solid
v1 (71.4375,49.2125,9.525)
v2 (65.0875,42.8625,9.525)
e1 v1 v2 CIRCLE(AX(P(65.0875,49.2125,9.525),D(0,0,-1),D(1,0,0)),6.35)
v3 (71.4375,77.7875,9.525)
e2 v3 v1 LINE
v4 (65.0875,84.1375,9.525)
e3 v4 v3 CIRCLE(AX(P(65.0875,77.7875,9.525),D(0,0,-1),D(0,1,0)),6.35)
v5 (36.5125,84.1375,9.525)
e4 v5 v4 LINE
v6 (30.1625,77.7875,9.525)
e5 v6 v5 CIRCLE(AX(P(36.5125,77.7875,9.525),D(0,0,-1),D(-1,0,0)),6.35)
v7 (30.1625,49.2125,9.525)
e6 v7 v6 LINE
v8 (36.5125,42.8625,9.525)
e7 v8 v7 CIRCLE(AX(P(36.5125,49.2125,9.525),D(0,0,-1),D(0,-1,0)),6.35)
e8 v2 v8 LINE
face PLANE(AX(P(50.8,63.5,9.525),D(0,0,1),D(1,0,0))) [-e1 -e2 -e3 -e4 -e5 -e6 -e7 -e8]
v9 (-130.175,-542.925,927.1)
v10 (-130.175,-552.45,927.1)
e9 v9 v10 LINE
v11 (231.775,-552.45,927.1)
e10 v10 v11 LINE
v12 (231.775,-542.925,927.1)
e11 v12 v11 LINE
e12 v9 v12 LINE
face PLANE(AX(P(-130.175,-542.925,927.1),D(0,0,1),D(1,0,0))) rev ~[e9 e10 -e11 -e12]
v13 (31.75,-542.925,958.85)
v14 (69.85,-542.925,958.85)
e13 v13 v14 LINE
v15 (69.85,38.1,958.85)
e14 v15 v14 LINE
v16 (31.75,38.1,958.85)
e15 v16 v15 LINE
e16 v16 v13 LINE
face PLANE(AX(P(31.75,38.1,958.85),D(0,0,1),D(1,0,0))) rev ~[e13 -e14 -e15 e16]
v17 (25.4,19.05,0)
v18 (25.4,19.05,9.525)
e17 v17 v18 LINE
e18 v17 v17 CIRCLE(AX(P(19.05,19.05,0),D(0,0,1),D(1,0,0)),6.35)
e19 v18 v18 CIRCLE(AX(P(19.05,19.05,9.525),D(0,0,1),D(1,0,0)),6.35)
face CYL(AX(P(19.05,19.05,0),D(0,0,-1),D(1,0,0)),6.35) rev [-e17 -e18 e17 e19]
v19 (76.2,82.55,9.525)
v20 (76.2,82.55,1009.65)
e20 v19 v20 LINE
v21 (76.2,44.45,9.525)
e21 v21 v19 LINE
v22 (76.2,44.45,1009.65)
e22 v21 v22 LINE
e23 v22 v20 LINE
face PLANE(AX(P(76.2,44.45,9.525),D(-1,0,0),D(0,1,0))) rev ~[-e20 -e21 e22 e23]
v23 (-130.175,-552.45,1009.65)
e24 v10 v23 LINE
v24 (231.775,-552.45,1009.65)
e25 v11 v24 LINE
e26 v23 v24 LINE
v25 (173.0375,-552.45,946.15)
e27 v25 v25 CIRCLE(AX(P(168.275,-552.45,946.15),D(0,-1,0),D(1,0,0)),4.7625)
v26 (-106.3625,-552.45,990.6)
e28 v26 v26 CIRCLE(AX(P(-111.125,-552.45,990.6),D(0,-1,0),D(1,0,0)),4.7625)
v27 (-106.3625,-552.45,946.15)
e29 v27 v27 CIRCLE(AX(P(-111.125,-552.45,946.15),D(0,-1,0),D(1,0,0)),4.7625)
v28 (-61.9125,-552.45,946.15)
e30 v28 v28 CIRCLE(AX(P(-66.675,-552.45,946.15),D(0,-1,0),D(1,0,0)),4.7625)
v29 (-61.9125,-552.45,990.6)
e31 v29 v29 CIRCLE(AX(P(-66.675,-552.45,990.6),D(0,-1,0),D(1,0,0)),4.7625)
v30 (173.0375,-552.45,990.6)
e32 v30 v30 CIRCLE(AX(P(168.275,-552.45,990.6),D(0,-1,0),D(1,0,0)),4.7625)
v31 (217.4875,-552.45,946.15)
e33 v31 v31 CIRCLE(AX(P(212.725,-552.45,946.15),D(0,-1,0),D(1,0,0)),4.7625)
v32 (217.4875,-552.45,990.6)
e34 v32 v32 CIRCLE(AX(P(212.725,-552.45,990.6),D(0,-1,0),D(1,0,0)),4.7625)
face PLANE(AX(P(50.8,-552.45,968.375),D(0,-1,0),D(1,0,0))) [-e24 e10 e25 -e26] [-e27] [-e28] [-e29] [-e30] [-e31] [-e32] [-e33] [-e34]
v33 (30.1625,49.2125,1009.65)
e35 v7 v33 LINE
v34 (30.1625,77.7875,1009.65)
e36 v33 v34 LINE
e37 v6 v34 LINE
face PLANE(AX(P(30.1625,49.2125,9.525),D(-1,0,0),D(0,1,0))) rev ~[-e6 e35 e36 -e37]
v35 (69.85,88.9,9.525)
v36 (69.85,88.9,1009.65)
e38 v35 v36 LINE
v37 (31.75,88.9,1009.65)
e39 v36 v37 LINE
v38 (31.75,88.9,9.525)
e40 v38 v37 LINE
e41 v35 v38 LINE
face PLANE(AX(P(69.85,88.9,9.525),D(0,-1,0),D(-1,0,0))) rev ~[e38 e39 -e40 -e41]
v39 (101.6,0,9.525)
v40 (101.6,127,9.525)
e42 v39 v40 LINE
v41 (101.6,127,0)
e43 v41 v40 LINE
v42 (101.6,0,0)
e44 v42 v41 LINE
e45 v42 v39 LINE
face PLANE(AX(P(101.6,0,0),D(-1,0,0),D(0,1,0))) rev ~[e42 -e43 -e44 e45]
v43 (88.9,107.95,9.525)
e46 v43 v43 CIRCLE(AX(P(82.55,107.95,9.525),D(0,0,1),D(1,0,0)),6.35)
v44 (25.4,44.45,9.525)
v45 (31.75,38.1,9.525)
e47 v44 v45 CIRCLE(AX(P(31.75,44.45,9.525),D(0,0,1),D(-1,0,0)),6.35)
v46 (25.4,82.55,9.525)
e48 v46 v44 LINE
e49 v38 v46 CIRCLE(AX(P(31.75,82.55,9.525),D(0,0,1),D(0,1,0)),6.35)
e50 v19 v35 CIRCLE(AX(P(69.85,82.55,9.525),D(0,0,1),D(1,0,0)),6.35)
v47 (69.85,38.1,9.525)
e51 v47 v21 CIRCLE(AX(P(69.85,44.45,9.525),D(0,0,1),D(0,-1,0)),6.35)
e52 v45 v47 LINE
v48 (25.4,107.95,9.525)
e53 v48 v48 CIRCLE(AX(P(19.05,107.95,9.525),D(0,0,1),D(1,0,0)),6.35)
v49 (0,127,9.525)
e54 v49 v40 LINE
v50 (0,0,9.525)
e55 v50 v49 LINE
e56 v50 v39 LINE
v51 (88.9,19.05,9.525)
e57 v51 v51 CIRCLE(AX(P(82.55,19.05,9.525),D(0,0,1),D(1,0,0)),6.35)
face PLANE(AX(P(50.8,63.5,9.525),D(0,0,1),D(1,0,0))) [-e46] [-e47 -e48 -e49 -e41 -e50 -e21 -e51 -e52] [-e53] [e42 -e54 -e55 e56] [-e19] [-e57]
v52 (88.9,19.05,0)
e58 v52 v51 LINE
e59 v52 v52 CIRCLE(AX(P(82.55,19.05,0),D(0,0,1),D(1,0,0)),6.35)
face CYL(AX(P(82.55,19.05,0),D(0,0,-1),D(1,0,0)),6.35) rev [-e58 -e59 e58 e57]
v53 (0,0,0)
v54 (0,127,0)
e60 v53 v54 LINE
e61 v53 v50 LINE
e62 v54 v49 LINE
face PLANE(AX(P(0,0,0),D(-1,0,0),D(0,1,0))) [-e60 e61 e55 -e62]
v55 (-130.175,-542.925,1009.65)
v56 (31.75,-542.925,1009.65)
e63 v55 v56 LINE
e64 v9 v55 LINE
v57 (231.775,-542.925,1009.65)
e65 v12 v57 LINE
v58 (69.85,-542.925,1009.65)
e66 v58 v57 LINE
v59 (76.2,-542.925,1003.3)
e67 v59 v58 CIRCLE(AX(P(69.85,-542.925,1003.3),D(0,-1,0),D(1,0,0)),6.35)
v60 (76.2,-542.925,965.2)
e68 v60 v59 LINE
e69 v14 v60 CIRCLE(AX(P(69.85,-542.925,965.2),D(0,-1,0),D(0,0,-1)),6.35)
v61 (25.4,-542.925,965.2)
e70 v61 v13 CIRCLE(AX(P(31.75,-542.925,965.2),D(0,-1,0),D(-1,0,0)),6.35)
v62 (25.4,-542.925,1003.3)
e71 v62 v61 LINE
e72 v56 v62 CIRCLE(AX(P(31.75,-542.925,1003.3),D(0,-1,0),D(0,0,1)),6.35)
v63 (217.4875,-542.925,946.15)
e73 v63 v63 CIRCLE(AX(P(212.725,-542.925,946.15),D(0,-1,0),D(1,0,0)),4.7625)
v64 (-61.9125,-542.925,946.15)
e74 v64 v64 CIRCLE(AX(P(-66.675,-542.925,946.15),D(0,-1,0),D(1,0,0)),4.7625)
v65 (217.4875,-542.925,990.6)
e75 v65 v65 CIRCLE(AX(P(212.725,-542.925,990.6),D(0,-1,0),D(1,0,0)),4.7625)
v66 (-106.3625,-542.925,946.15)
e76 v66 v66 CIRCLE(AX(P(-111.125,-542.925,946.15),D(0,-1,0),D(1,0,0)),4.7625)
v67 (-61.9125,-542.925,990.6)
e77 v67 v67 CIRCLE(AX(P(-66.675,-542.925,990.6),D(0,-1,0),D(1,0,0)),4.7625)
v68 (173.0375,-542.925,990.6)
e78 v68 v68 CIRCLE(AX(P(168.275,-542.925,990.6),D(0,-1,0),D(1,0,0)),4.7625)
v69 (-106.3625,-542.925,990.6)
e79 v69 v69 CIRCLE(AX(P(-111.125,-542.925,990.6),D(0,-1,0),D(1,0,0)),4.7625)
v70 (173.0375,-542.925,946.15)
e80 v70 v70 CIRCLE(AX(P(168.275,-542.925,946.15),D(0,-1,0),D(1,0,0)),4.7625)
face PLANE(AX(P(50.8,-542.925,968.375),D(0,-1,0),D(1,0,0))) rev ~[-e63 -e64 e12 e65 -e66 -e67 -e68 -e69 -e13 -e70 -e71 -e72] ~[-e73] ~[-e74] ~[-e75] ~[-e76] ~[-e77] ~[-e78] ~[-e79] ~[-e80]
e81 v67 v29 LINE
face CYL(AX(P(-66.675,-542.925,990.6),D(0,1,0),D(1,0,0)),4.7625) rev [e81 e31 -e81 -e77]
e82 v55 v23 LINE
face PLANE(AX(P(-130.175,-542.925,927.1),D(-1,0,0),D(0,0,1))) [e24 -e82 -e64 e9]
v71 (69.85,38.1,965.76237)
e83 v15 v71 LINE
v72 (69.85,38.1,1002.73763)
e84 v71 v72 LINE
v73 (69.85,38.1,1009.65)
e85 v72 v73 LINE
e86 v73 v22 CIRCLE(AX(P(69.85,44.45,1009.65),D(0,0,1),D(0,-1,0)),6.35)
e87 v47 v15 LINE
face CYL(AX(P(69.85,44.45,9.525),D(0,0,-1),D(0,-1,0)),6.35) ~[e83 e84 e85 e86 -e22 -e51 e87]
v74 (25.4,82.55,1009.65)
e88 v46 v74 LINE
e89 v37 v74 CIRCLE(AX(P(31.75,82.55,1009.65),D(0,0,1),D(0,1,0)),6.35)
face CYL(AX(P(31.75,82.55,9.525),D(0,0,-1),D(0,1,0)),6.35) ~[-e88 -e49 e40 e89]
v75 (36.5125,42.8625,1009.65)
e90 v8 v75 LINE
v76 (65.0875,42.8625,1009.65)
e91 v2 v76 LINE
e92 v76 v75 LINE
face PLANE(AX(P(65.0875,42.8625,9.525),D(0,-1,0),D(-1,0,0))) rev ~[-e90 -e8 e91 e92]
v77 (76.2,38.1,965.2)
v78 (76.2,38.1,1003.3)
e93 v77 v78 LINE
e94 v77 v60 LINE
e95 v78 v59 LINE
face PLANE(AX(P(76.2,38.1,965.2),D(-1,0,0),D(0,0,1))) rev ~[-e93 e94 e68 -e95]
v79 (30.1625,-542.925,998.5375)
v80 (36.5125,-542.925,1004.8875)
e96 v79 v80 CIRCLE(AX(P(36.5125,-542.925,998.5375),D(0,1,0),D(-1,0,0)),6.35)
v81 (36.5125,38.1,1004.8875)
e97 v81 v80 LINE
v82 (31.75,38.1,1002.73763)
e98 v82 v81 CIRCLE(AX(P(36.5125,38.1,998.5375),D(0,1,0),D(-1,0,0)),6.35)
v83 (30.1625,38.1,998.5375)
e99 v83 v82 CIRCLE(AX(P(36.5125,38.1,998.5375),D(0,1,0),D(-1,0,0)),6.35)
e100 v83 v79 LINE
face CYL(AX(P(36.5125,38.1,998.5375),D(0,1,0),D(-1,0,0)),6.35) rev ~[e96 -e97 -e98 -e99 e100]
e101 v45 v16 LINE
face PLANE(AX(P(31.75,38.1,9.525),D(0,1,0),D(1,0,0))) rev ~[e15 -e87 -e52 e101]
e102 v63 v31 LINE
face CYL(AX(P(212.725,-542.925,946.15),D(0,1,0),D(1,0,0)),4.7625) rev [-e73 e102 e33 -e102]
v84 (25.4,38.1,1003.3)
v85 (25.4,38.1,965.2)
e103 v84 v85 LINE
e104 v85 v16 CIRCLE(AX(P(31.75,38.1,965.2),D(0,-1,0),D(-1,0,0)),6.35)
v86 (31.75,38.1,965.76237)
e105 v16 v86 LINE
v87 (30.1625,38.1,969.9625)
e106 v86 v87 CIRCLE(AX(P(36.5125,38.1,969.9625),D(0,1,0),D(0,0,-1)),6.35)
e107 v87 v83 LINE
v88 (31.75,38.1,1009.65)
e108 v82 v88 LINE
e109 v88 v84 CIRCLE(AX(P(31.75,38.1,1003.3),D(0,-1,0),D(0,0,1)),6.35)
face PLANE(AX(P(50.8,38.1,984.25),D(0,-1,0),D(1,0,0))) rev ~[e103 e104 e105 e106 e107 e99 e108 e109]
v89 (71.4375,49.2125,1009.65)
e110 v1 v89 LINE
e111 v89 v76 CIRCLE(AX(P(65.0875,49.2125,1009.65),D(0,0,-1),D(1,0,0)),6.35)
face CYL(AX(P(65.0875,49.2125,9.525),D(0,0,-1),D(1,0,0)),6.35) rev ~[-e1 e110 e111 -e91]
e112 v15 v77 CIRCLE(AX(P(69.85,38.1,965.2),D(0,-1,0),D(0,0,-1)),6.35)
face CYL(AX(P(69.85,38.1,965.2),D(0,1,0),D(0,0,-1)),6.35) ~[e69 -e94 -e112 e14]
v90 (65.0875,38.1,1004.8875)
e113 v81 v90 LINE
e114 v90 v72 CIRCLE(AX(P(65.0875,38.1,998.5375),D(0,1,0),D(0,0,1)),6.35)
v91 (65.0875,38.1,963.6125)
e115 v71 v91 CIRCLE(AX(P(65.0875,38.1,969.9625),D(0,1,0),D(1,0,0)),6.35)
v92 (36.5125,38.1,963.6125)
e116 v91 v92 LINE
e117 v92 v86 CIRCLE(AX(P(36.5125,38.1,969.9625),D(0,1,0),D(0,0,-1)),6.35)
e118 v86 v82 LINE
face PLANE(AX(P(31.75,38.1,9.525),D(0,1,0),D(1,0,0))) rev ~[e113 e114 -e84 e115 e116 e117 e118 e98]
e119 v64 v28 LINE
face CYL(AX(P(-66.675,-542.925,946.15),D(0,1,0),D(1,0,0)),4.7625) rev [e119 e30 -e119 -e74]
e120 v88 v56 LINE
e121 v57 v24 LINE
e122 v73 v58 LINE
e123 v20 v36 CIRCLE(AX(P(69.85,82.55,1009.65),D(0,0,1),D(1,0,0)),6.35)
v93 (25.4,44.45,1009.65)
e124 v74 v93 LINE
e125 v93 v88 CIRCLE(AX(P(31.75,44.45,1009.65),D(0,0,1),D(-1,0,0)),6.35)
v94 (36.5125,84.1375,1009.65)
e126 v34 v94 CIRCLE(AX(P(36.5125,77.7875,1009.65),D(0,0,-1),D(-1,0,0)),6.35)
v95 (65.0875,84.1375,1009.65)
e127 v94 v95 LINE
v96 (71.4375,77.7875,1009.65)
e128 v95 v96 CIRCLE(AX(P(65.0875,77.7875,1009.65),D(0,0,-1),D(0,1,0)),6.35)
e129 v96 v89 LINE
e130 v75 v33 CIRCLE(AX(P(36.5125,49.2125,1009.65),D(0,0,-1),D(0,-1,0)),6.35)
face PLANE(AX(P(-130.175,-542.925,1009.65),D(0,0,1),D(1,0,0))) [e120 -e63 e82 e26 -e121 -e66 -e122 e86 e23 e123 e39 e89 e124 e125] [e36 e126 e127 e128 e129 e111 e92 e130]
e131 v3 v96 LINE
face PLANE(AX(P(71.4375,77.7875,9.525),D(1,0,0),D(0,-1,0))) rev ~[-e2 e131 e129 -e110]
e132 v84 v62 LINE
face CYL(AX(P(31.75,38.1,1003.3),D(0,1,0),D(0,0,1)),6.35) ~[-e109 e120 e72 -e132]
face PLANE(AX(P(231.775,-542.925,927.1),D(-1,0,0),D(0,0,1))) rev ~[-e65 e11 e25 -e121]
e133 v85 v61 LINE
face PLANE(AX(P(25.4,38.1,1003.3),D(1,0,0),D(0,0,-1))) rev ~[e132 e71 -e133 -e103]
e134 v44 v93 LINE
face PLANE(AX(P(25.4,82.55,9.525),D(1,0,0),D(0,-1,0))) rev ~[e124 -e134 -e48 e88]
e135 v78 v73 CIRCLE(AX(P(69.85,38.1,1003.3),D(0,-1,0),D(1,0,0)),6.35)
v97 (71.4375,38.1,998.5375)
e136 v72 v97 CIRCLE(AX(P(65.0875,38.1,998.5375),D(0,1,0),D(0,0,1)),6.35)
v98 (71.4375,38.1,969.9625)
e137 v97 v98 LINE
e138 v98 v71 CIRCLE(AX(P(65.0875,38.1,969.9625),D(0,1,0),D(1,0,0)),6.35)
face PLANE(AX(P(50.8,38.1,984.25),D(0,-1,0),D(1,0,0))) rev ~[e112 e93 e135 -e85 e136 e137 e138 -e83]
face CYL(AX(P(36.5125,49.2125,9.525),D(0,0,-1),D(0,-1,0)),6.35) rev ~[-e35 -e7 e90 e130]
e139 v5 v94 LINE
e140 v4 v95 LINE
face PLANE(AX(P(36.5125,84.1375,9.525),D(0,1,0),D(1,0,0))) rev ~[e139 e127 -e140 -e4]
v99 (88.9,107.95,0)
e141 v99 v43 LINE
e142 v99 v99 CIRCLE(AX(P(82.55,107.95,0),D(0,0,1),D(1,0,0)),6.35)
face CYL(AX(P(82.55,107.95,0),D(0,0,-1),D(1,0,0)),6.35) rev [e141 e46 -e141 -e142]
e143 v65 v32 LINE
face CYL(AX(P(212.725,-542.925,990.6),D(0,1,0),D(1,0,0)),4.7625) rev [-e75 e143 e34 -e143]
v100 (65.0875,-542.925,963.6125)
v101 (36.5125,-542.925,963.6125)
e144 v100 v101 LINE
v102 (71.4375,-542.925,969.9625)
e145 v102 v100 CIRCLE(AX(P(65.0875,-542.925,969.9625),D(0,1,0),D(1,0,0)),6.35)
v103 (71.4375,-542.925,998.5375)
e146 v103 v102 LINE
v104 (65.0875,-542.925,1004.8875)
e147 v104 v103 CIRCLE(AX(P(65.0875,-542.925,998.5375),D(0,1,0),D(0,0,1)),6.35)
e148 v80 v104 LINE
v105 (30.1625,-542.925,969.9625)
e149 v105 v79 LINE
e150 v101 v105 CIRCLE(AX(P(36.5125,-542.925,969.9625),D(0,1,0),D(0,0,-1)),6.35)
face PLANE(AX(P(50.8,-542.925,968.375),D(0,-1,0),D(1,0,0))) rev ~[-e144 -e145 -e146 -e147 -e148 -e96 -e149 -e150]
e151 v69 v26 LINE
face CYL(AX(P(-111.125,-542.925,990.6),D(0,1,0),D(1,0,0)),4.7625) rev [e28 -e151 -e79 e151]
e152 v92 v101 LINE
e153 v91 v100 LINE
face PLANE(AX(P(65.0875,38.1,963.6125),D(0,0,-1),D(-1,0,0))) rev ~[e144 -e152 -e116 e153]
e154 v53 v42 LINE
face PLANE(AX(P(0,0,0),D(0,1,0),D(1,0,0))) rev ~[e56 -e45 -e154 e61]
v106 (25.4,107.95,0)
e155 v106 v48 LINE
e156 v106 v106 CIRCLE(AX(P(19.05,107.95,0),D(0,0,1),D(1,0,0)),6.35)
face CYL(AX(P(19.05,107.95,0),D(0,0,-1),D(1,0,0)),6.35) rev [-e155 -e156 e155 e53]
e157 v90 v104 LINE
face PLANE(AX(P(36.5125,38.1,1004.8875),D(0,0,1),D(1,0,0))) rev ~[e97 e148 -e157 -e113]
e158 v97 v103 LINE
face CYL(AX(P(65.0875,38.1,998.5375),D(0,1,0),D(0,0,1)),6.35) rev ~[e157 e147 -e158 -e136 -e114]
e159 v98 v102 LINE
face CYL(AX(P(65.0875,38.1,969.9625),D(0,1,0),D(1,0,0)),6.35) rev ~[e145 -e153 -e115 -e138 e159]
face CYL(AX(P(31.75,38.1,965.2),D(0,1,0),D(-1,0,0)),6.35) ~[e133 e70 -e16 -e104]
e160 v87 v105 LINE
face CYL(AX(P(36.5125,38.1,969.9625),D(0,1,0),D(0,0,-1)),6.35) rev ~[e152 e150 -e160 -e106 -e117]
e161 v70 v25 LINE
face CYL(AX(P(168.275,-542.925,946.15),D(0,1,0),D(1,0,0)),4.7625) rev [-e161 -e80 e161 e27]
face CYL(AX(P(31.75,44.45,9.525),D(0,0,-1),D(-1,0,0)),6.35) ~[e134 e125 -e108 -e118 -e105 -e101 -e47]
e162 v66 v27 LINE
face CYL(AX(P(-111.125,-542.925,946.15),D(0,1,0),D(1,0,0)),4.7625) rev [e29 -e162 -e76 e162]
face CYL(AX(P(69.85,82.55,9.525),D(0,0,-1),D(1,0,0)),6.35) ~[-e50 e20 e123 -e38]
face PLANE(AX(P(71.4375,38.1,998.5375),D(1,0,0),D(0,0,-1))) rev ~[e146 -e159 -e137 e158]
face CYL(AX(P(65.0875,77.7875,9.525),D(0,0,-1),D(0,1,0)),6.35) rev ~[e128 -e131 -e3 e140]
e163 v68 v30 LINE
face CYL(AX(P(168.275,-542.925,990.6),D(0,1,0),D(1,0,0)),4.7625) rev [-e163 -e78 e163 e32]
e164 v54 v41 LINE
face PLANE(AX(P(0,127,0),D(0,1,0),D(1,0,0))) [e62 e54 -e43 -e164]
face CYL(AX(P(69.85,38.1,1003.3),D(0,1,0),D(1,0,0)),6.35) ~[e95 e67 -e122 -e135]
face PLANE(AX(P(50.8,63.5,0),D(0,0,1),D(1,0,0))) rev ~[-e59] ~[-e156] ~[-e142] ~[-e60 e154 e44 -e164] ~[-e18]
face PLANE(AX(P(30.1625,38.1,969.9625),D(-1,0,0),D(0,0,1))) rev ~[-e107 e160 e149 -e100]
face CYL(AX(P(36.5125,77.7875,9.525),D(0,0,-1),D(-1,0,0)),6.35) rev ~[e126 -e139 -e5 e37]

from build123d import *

# Parameters (mm, degrees)
F0_W     = 101.6
F0_H     = 127
F0_R     = 6.35
F1_DEPTH = 9.525
F4_DEPTH = 1000.125
F6_DEPTH = 581.025
F7_W     = 361.95
F7_H     = 82.55
F7_R     = 4.7625
F8_DEPTH = 9.525


# Not quite as in the source:
# - a length typed as a fraction of an inch, garbled in the dataset ("3 / 203.2 mm" for 3/8 in), is restored


with BuildPart() as f1:
    # F0 (on Top) → F1 (new body)
    with BuildSketch(Plane.XY):
        with Locations((50.8, 63.5)):
            Rectangle(F0_W, F0_H)
        with Locations((19.05, 19.05)):
            Circle(F0_R, mode=Mode.SUBTRACT)
        with Locations((82.55, 19.05)):
            Circle(F0_R, mode=Mode.SUBTRACT)
        with Locations((19.05, 107.95)):
            Circle(F0_R, mode=Mode.SUBTRACT)
        with Locations((82.55, 107.95)):
            Circle(F0_R, mode=Mode.SUBTRACT)
    extrude(amount=F1_DEPTH)

    # F3 (on offset) → F4 (join)
    with BuildSketch(Plane.XY.offset(9.525)):
        with BuildLine():
            Line((31.75, 38.1), (69.85, 38.1))
            ThreePointArc((69.85, 38.1), (74.3401280605, 39.9598719395), (76.2, 44.45))
            Line((76.2, 44.45), (76.2, 82.55))
            ThreePointArc((76.2, 82.55), (74.3401280605, 87.0401280605), (69.85, 88.9))
            Line((69.85, 88.9), (31.75, 88.9))
            ThreePointArc((31.75, 88.9), (27.2598719395, 87.0401280605), (25.4, 82.55))
            Line((25.4, 82.55), (25.4, 44.45))
            ThreePointArc((25.4, 44.45), (27.2598719395, 39.9598719395), (31.75, 38.1))
        make_face()
        with BuildLine():
            ThreePointArc((71.4375, 49.2125), (69.5776280605, 44.7223719395), (65.0875, 42.8625))
            Line((65.0875, 42.8625), (36.5125, 42.8625))
            ThreePointArc((36.5125, 42.8625), (32.0223719395, 44.7223719395), (30.1625, 49.2125))
            Line((30.1625, 49.2125), (30.1625, 77.7875))
            ThreePointArc((30.1625, 77.7875), (32.0223719395, 82.2776280605), (36.5125, 84.1375))
            Line((36.5125, 84.1375), (65.0875, 84.1375))
            ThreePointArc((65.0875, 84.1375), (69.5776280605, 82.2776280605), (71.4375, 77.7875))
            Line((71.4375, 77.7875), (71.4375, 49.2125))
        make_face(mode=Mode.SUBTRACT)
    extrude(amount=F4_DEPTH)

    # F5 (on face) → F6 (join)
    with BuildSketch(Plane.XZ.offset(-38.1)):
        with BuildLine():
            Line((31.75, 958.85), (69.85, 958.85))
            ThreePointArc((69.85, 958.85), (74.3401280605, 960.7098719395), (76.2, 965.2))
            Line((76.2, 965.2), (76.2, 1003.3))
            ThreePointArc((76.2, 1003.3), (74.3401280605, 1007.7901280605), (69.85, 1009.65))
            Line((69.85, 1009.65), (31.75, 1009.65))
            ThreePointArc((31.75, 1009.65), (27.2598719395, 1007.7901280605), (25.4, 1003.3))
            Line((25.4, 1003.3), (25.4, 965.2))
            ThreePointArc((25.4, 965.2), (27.2598719395, 960.7098719395), (31.75, 958.85))
        make_face()
        with BuildLine():
            ThreePointArc((71.4375, 969.9625), (69.5776280605, 965.4723719395), (65.0875, 963.6125))
            Line((65.0875, 963.6125), (36.5125, 963.6125))
            ThreePointArc((36.5125, 963.6125), (32.0223719395, 965.4723719395), (30.1625, 969.9625))
            Line((30.1625, 969.9625), (30.1625, 998.5375))
            ThreePointArc((30.1625, 998.5375), (32.0223719395, 1003.0276280605), (36.5125, 1004.8875))
            Line((36.5125, 1004.8875), (65.0875, 1004.8875))
            ThreePointArc((65.0875, 1004.8875), (69.5776280605, 1003.0276280605), (71.4375, 998.5375))
            Line((71.4375, 998.5375), (71.4375, 969.9625))
        make_face(mode=Mode.SUBTRACT)
    extrude(amount=F6_DEPTH)

    # F7 (on face) → F8 (join)
    with BuildSketch(Plane.XZ.offset(542.925)):
        with Locations((50.8, 968.375)):
            Rectangle(F7_W, F7_H)
        with Locations((-111.125, 946.15)):
            Circle(F7_R, mode=Mode.SUBTRACT)
        with Locations((-66.675, 946.15)):
            Circle(F7_R, mode=Mode.SUBTRACT)
        with Locations((168.275, 946.15)):
            Circle(F7_R, mode=Mode.SUBTRACT)
        with Locations((212.725, 946.15)):
            Circle(F7_R, mode=Mode.SUBTRACT)
        with Locations((-111.125, 990.6)):
            Circle(F7_R, mode=Mode.SUBTRACT)
        with Locations((-66.675, 990.6)):
            Circle(F7_R, mode=Mode.SUBTRACT)
        with Locations((168.275, 990.6)):
            Circle(F7_R, mode=Mode.SUBTRACT)
        with Locations((212.725, 990.6)):
            Circle(F7_R, mode=Mode.SUBTRACT)
    extrude(amount=F8_DEPTH)


solid = f1.part
